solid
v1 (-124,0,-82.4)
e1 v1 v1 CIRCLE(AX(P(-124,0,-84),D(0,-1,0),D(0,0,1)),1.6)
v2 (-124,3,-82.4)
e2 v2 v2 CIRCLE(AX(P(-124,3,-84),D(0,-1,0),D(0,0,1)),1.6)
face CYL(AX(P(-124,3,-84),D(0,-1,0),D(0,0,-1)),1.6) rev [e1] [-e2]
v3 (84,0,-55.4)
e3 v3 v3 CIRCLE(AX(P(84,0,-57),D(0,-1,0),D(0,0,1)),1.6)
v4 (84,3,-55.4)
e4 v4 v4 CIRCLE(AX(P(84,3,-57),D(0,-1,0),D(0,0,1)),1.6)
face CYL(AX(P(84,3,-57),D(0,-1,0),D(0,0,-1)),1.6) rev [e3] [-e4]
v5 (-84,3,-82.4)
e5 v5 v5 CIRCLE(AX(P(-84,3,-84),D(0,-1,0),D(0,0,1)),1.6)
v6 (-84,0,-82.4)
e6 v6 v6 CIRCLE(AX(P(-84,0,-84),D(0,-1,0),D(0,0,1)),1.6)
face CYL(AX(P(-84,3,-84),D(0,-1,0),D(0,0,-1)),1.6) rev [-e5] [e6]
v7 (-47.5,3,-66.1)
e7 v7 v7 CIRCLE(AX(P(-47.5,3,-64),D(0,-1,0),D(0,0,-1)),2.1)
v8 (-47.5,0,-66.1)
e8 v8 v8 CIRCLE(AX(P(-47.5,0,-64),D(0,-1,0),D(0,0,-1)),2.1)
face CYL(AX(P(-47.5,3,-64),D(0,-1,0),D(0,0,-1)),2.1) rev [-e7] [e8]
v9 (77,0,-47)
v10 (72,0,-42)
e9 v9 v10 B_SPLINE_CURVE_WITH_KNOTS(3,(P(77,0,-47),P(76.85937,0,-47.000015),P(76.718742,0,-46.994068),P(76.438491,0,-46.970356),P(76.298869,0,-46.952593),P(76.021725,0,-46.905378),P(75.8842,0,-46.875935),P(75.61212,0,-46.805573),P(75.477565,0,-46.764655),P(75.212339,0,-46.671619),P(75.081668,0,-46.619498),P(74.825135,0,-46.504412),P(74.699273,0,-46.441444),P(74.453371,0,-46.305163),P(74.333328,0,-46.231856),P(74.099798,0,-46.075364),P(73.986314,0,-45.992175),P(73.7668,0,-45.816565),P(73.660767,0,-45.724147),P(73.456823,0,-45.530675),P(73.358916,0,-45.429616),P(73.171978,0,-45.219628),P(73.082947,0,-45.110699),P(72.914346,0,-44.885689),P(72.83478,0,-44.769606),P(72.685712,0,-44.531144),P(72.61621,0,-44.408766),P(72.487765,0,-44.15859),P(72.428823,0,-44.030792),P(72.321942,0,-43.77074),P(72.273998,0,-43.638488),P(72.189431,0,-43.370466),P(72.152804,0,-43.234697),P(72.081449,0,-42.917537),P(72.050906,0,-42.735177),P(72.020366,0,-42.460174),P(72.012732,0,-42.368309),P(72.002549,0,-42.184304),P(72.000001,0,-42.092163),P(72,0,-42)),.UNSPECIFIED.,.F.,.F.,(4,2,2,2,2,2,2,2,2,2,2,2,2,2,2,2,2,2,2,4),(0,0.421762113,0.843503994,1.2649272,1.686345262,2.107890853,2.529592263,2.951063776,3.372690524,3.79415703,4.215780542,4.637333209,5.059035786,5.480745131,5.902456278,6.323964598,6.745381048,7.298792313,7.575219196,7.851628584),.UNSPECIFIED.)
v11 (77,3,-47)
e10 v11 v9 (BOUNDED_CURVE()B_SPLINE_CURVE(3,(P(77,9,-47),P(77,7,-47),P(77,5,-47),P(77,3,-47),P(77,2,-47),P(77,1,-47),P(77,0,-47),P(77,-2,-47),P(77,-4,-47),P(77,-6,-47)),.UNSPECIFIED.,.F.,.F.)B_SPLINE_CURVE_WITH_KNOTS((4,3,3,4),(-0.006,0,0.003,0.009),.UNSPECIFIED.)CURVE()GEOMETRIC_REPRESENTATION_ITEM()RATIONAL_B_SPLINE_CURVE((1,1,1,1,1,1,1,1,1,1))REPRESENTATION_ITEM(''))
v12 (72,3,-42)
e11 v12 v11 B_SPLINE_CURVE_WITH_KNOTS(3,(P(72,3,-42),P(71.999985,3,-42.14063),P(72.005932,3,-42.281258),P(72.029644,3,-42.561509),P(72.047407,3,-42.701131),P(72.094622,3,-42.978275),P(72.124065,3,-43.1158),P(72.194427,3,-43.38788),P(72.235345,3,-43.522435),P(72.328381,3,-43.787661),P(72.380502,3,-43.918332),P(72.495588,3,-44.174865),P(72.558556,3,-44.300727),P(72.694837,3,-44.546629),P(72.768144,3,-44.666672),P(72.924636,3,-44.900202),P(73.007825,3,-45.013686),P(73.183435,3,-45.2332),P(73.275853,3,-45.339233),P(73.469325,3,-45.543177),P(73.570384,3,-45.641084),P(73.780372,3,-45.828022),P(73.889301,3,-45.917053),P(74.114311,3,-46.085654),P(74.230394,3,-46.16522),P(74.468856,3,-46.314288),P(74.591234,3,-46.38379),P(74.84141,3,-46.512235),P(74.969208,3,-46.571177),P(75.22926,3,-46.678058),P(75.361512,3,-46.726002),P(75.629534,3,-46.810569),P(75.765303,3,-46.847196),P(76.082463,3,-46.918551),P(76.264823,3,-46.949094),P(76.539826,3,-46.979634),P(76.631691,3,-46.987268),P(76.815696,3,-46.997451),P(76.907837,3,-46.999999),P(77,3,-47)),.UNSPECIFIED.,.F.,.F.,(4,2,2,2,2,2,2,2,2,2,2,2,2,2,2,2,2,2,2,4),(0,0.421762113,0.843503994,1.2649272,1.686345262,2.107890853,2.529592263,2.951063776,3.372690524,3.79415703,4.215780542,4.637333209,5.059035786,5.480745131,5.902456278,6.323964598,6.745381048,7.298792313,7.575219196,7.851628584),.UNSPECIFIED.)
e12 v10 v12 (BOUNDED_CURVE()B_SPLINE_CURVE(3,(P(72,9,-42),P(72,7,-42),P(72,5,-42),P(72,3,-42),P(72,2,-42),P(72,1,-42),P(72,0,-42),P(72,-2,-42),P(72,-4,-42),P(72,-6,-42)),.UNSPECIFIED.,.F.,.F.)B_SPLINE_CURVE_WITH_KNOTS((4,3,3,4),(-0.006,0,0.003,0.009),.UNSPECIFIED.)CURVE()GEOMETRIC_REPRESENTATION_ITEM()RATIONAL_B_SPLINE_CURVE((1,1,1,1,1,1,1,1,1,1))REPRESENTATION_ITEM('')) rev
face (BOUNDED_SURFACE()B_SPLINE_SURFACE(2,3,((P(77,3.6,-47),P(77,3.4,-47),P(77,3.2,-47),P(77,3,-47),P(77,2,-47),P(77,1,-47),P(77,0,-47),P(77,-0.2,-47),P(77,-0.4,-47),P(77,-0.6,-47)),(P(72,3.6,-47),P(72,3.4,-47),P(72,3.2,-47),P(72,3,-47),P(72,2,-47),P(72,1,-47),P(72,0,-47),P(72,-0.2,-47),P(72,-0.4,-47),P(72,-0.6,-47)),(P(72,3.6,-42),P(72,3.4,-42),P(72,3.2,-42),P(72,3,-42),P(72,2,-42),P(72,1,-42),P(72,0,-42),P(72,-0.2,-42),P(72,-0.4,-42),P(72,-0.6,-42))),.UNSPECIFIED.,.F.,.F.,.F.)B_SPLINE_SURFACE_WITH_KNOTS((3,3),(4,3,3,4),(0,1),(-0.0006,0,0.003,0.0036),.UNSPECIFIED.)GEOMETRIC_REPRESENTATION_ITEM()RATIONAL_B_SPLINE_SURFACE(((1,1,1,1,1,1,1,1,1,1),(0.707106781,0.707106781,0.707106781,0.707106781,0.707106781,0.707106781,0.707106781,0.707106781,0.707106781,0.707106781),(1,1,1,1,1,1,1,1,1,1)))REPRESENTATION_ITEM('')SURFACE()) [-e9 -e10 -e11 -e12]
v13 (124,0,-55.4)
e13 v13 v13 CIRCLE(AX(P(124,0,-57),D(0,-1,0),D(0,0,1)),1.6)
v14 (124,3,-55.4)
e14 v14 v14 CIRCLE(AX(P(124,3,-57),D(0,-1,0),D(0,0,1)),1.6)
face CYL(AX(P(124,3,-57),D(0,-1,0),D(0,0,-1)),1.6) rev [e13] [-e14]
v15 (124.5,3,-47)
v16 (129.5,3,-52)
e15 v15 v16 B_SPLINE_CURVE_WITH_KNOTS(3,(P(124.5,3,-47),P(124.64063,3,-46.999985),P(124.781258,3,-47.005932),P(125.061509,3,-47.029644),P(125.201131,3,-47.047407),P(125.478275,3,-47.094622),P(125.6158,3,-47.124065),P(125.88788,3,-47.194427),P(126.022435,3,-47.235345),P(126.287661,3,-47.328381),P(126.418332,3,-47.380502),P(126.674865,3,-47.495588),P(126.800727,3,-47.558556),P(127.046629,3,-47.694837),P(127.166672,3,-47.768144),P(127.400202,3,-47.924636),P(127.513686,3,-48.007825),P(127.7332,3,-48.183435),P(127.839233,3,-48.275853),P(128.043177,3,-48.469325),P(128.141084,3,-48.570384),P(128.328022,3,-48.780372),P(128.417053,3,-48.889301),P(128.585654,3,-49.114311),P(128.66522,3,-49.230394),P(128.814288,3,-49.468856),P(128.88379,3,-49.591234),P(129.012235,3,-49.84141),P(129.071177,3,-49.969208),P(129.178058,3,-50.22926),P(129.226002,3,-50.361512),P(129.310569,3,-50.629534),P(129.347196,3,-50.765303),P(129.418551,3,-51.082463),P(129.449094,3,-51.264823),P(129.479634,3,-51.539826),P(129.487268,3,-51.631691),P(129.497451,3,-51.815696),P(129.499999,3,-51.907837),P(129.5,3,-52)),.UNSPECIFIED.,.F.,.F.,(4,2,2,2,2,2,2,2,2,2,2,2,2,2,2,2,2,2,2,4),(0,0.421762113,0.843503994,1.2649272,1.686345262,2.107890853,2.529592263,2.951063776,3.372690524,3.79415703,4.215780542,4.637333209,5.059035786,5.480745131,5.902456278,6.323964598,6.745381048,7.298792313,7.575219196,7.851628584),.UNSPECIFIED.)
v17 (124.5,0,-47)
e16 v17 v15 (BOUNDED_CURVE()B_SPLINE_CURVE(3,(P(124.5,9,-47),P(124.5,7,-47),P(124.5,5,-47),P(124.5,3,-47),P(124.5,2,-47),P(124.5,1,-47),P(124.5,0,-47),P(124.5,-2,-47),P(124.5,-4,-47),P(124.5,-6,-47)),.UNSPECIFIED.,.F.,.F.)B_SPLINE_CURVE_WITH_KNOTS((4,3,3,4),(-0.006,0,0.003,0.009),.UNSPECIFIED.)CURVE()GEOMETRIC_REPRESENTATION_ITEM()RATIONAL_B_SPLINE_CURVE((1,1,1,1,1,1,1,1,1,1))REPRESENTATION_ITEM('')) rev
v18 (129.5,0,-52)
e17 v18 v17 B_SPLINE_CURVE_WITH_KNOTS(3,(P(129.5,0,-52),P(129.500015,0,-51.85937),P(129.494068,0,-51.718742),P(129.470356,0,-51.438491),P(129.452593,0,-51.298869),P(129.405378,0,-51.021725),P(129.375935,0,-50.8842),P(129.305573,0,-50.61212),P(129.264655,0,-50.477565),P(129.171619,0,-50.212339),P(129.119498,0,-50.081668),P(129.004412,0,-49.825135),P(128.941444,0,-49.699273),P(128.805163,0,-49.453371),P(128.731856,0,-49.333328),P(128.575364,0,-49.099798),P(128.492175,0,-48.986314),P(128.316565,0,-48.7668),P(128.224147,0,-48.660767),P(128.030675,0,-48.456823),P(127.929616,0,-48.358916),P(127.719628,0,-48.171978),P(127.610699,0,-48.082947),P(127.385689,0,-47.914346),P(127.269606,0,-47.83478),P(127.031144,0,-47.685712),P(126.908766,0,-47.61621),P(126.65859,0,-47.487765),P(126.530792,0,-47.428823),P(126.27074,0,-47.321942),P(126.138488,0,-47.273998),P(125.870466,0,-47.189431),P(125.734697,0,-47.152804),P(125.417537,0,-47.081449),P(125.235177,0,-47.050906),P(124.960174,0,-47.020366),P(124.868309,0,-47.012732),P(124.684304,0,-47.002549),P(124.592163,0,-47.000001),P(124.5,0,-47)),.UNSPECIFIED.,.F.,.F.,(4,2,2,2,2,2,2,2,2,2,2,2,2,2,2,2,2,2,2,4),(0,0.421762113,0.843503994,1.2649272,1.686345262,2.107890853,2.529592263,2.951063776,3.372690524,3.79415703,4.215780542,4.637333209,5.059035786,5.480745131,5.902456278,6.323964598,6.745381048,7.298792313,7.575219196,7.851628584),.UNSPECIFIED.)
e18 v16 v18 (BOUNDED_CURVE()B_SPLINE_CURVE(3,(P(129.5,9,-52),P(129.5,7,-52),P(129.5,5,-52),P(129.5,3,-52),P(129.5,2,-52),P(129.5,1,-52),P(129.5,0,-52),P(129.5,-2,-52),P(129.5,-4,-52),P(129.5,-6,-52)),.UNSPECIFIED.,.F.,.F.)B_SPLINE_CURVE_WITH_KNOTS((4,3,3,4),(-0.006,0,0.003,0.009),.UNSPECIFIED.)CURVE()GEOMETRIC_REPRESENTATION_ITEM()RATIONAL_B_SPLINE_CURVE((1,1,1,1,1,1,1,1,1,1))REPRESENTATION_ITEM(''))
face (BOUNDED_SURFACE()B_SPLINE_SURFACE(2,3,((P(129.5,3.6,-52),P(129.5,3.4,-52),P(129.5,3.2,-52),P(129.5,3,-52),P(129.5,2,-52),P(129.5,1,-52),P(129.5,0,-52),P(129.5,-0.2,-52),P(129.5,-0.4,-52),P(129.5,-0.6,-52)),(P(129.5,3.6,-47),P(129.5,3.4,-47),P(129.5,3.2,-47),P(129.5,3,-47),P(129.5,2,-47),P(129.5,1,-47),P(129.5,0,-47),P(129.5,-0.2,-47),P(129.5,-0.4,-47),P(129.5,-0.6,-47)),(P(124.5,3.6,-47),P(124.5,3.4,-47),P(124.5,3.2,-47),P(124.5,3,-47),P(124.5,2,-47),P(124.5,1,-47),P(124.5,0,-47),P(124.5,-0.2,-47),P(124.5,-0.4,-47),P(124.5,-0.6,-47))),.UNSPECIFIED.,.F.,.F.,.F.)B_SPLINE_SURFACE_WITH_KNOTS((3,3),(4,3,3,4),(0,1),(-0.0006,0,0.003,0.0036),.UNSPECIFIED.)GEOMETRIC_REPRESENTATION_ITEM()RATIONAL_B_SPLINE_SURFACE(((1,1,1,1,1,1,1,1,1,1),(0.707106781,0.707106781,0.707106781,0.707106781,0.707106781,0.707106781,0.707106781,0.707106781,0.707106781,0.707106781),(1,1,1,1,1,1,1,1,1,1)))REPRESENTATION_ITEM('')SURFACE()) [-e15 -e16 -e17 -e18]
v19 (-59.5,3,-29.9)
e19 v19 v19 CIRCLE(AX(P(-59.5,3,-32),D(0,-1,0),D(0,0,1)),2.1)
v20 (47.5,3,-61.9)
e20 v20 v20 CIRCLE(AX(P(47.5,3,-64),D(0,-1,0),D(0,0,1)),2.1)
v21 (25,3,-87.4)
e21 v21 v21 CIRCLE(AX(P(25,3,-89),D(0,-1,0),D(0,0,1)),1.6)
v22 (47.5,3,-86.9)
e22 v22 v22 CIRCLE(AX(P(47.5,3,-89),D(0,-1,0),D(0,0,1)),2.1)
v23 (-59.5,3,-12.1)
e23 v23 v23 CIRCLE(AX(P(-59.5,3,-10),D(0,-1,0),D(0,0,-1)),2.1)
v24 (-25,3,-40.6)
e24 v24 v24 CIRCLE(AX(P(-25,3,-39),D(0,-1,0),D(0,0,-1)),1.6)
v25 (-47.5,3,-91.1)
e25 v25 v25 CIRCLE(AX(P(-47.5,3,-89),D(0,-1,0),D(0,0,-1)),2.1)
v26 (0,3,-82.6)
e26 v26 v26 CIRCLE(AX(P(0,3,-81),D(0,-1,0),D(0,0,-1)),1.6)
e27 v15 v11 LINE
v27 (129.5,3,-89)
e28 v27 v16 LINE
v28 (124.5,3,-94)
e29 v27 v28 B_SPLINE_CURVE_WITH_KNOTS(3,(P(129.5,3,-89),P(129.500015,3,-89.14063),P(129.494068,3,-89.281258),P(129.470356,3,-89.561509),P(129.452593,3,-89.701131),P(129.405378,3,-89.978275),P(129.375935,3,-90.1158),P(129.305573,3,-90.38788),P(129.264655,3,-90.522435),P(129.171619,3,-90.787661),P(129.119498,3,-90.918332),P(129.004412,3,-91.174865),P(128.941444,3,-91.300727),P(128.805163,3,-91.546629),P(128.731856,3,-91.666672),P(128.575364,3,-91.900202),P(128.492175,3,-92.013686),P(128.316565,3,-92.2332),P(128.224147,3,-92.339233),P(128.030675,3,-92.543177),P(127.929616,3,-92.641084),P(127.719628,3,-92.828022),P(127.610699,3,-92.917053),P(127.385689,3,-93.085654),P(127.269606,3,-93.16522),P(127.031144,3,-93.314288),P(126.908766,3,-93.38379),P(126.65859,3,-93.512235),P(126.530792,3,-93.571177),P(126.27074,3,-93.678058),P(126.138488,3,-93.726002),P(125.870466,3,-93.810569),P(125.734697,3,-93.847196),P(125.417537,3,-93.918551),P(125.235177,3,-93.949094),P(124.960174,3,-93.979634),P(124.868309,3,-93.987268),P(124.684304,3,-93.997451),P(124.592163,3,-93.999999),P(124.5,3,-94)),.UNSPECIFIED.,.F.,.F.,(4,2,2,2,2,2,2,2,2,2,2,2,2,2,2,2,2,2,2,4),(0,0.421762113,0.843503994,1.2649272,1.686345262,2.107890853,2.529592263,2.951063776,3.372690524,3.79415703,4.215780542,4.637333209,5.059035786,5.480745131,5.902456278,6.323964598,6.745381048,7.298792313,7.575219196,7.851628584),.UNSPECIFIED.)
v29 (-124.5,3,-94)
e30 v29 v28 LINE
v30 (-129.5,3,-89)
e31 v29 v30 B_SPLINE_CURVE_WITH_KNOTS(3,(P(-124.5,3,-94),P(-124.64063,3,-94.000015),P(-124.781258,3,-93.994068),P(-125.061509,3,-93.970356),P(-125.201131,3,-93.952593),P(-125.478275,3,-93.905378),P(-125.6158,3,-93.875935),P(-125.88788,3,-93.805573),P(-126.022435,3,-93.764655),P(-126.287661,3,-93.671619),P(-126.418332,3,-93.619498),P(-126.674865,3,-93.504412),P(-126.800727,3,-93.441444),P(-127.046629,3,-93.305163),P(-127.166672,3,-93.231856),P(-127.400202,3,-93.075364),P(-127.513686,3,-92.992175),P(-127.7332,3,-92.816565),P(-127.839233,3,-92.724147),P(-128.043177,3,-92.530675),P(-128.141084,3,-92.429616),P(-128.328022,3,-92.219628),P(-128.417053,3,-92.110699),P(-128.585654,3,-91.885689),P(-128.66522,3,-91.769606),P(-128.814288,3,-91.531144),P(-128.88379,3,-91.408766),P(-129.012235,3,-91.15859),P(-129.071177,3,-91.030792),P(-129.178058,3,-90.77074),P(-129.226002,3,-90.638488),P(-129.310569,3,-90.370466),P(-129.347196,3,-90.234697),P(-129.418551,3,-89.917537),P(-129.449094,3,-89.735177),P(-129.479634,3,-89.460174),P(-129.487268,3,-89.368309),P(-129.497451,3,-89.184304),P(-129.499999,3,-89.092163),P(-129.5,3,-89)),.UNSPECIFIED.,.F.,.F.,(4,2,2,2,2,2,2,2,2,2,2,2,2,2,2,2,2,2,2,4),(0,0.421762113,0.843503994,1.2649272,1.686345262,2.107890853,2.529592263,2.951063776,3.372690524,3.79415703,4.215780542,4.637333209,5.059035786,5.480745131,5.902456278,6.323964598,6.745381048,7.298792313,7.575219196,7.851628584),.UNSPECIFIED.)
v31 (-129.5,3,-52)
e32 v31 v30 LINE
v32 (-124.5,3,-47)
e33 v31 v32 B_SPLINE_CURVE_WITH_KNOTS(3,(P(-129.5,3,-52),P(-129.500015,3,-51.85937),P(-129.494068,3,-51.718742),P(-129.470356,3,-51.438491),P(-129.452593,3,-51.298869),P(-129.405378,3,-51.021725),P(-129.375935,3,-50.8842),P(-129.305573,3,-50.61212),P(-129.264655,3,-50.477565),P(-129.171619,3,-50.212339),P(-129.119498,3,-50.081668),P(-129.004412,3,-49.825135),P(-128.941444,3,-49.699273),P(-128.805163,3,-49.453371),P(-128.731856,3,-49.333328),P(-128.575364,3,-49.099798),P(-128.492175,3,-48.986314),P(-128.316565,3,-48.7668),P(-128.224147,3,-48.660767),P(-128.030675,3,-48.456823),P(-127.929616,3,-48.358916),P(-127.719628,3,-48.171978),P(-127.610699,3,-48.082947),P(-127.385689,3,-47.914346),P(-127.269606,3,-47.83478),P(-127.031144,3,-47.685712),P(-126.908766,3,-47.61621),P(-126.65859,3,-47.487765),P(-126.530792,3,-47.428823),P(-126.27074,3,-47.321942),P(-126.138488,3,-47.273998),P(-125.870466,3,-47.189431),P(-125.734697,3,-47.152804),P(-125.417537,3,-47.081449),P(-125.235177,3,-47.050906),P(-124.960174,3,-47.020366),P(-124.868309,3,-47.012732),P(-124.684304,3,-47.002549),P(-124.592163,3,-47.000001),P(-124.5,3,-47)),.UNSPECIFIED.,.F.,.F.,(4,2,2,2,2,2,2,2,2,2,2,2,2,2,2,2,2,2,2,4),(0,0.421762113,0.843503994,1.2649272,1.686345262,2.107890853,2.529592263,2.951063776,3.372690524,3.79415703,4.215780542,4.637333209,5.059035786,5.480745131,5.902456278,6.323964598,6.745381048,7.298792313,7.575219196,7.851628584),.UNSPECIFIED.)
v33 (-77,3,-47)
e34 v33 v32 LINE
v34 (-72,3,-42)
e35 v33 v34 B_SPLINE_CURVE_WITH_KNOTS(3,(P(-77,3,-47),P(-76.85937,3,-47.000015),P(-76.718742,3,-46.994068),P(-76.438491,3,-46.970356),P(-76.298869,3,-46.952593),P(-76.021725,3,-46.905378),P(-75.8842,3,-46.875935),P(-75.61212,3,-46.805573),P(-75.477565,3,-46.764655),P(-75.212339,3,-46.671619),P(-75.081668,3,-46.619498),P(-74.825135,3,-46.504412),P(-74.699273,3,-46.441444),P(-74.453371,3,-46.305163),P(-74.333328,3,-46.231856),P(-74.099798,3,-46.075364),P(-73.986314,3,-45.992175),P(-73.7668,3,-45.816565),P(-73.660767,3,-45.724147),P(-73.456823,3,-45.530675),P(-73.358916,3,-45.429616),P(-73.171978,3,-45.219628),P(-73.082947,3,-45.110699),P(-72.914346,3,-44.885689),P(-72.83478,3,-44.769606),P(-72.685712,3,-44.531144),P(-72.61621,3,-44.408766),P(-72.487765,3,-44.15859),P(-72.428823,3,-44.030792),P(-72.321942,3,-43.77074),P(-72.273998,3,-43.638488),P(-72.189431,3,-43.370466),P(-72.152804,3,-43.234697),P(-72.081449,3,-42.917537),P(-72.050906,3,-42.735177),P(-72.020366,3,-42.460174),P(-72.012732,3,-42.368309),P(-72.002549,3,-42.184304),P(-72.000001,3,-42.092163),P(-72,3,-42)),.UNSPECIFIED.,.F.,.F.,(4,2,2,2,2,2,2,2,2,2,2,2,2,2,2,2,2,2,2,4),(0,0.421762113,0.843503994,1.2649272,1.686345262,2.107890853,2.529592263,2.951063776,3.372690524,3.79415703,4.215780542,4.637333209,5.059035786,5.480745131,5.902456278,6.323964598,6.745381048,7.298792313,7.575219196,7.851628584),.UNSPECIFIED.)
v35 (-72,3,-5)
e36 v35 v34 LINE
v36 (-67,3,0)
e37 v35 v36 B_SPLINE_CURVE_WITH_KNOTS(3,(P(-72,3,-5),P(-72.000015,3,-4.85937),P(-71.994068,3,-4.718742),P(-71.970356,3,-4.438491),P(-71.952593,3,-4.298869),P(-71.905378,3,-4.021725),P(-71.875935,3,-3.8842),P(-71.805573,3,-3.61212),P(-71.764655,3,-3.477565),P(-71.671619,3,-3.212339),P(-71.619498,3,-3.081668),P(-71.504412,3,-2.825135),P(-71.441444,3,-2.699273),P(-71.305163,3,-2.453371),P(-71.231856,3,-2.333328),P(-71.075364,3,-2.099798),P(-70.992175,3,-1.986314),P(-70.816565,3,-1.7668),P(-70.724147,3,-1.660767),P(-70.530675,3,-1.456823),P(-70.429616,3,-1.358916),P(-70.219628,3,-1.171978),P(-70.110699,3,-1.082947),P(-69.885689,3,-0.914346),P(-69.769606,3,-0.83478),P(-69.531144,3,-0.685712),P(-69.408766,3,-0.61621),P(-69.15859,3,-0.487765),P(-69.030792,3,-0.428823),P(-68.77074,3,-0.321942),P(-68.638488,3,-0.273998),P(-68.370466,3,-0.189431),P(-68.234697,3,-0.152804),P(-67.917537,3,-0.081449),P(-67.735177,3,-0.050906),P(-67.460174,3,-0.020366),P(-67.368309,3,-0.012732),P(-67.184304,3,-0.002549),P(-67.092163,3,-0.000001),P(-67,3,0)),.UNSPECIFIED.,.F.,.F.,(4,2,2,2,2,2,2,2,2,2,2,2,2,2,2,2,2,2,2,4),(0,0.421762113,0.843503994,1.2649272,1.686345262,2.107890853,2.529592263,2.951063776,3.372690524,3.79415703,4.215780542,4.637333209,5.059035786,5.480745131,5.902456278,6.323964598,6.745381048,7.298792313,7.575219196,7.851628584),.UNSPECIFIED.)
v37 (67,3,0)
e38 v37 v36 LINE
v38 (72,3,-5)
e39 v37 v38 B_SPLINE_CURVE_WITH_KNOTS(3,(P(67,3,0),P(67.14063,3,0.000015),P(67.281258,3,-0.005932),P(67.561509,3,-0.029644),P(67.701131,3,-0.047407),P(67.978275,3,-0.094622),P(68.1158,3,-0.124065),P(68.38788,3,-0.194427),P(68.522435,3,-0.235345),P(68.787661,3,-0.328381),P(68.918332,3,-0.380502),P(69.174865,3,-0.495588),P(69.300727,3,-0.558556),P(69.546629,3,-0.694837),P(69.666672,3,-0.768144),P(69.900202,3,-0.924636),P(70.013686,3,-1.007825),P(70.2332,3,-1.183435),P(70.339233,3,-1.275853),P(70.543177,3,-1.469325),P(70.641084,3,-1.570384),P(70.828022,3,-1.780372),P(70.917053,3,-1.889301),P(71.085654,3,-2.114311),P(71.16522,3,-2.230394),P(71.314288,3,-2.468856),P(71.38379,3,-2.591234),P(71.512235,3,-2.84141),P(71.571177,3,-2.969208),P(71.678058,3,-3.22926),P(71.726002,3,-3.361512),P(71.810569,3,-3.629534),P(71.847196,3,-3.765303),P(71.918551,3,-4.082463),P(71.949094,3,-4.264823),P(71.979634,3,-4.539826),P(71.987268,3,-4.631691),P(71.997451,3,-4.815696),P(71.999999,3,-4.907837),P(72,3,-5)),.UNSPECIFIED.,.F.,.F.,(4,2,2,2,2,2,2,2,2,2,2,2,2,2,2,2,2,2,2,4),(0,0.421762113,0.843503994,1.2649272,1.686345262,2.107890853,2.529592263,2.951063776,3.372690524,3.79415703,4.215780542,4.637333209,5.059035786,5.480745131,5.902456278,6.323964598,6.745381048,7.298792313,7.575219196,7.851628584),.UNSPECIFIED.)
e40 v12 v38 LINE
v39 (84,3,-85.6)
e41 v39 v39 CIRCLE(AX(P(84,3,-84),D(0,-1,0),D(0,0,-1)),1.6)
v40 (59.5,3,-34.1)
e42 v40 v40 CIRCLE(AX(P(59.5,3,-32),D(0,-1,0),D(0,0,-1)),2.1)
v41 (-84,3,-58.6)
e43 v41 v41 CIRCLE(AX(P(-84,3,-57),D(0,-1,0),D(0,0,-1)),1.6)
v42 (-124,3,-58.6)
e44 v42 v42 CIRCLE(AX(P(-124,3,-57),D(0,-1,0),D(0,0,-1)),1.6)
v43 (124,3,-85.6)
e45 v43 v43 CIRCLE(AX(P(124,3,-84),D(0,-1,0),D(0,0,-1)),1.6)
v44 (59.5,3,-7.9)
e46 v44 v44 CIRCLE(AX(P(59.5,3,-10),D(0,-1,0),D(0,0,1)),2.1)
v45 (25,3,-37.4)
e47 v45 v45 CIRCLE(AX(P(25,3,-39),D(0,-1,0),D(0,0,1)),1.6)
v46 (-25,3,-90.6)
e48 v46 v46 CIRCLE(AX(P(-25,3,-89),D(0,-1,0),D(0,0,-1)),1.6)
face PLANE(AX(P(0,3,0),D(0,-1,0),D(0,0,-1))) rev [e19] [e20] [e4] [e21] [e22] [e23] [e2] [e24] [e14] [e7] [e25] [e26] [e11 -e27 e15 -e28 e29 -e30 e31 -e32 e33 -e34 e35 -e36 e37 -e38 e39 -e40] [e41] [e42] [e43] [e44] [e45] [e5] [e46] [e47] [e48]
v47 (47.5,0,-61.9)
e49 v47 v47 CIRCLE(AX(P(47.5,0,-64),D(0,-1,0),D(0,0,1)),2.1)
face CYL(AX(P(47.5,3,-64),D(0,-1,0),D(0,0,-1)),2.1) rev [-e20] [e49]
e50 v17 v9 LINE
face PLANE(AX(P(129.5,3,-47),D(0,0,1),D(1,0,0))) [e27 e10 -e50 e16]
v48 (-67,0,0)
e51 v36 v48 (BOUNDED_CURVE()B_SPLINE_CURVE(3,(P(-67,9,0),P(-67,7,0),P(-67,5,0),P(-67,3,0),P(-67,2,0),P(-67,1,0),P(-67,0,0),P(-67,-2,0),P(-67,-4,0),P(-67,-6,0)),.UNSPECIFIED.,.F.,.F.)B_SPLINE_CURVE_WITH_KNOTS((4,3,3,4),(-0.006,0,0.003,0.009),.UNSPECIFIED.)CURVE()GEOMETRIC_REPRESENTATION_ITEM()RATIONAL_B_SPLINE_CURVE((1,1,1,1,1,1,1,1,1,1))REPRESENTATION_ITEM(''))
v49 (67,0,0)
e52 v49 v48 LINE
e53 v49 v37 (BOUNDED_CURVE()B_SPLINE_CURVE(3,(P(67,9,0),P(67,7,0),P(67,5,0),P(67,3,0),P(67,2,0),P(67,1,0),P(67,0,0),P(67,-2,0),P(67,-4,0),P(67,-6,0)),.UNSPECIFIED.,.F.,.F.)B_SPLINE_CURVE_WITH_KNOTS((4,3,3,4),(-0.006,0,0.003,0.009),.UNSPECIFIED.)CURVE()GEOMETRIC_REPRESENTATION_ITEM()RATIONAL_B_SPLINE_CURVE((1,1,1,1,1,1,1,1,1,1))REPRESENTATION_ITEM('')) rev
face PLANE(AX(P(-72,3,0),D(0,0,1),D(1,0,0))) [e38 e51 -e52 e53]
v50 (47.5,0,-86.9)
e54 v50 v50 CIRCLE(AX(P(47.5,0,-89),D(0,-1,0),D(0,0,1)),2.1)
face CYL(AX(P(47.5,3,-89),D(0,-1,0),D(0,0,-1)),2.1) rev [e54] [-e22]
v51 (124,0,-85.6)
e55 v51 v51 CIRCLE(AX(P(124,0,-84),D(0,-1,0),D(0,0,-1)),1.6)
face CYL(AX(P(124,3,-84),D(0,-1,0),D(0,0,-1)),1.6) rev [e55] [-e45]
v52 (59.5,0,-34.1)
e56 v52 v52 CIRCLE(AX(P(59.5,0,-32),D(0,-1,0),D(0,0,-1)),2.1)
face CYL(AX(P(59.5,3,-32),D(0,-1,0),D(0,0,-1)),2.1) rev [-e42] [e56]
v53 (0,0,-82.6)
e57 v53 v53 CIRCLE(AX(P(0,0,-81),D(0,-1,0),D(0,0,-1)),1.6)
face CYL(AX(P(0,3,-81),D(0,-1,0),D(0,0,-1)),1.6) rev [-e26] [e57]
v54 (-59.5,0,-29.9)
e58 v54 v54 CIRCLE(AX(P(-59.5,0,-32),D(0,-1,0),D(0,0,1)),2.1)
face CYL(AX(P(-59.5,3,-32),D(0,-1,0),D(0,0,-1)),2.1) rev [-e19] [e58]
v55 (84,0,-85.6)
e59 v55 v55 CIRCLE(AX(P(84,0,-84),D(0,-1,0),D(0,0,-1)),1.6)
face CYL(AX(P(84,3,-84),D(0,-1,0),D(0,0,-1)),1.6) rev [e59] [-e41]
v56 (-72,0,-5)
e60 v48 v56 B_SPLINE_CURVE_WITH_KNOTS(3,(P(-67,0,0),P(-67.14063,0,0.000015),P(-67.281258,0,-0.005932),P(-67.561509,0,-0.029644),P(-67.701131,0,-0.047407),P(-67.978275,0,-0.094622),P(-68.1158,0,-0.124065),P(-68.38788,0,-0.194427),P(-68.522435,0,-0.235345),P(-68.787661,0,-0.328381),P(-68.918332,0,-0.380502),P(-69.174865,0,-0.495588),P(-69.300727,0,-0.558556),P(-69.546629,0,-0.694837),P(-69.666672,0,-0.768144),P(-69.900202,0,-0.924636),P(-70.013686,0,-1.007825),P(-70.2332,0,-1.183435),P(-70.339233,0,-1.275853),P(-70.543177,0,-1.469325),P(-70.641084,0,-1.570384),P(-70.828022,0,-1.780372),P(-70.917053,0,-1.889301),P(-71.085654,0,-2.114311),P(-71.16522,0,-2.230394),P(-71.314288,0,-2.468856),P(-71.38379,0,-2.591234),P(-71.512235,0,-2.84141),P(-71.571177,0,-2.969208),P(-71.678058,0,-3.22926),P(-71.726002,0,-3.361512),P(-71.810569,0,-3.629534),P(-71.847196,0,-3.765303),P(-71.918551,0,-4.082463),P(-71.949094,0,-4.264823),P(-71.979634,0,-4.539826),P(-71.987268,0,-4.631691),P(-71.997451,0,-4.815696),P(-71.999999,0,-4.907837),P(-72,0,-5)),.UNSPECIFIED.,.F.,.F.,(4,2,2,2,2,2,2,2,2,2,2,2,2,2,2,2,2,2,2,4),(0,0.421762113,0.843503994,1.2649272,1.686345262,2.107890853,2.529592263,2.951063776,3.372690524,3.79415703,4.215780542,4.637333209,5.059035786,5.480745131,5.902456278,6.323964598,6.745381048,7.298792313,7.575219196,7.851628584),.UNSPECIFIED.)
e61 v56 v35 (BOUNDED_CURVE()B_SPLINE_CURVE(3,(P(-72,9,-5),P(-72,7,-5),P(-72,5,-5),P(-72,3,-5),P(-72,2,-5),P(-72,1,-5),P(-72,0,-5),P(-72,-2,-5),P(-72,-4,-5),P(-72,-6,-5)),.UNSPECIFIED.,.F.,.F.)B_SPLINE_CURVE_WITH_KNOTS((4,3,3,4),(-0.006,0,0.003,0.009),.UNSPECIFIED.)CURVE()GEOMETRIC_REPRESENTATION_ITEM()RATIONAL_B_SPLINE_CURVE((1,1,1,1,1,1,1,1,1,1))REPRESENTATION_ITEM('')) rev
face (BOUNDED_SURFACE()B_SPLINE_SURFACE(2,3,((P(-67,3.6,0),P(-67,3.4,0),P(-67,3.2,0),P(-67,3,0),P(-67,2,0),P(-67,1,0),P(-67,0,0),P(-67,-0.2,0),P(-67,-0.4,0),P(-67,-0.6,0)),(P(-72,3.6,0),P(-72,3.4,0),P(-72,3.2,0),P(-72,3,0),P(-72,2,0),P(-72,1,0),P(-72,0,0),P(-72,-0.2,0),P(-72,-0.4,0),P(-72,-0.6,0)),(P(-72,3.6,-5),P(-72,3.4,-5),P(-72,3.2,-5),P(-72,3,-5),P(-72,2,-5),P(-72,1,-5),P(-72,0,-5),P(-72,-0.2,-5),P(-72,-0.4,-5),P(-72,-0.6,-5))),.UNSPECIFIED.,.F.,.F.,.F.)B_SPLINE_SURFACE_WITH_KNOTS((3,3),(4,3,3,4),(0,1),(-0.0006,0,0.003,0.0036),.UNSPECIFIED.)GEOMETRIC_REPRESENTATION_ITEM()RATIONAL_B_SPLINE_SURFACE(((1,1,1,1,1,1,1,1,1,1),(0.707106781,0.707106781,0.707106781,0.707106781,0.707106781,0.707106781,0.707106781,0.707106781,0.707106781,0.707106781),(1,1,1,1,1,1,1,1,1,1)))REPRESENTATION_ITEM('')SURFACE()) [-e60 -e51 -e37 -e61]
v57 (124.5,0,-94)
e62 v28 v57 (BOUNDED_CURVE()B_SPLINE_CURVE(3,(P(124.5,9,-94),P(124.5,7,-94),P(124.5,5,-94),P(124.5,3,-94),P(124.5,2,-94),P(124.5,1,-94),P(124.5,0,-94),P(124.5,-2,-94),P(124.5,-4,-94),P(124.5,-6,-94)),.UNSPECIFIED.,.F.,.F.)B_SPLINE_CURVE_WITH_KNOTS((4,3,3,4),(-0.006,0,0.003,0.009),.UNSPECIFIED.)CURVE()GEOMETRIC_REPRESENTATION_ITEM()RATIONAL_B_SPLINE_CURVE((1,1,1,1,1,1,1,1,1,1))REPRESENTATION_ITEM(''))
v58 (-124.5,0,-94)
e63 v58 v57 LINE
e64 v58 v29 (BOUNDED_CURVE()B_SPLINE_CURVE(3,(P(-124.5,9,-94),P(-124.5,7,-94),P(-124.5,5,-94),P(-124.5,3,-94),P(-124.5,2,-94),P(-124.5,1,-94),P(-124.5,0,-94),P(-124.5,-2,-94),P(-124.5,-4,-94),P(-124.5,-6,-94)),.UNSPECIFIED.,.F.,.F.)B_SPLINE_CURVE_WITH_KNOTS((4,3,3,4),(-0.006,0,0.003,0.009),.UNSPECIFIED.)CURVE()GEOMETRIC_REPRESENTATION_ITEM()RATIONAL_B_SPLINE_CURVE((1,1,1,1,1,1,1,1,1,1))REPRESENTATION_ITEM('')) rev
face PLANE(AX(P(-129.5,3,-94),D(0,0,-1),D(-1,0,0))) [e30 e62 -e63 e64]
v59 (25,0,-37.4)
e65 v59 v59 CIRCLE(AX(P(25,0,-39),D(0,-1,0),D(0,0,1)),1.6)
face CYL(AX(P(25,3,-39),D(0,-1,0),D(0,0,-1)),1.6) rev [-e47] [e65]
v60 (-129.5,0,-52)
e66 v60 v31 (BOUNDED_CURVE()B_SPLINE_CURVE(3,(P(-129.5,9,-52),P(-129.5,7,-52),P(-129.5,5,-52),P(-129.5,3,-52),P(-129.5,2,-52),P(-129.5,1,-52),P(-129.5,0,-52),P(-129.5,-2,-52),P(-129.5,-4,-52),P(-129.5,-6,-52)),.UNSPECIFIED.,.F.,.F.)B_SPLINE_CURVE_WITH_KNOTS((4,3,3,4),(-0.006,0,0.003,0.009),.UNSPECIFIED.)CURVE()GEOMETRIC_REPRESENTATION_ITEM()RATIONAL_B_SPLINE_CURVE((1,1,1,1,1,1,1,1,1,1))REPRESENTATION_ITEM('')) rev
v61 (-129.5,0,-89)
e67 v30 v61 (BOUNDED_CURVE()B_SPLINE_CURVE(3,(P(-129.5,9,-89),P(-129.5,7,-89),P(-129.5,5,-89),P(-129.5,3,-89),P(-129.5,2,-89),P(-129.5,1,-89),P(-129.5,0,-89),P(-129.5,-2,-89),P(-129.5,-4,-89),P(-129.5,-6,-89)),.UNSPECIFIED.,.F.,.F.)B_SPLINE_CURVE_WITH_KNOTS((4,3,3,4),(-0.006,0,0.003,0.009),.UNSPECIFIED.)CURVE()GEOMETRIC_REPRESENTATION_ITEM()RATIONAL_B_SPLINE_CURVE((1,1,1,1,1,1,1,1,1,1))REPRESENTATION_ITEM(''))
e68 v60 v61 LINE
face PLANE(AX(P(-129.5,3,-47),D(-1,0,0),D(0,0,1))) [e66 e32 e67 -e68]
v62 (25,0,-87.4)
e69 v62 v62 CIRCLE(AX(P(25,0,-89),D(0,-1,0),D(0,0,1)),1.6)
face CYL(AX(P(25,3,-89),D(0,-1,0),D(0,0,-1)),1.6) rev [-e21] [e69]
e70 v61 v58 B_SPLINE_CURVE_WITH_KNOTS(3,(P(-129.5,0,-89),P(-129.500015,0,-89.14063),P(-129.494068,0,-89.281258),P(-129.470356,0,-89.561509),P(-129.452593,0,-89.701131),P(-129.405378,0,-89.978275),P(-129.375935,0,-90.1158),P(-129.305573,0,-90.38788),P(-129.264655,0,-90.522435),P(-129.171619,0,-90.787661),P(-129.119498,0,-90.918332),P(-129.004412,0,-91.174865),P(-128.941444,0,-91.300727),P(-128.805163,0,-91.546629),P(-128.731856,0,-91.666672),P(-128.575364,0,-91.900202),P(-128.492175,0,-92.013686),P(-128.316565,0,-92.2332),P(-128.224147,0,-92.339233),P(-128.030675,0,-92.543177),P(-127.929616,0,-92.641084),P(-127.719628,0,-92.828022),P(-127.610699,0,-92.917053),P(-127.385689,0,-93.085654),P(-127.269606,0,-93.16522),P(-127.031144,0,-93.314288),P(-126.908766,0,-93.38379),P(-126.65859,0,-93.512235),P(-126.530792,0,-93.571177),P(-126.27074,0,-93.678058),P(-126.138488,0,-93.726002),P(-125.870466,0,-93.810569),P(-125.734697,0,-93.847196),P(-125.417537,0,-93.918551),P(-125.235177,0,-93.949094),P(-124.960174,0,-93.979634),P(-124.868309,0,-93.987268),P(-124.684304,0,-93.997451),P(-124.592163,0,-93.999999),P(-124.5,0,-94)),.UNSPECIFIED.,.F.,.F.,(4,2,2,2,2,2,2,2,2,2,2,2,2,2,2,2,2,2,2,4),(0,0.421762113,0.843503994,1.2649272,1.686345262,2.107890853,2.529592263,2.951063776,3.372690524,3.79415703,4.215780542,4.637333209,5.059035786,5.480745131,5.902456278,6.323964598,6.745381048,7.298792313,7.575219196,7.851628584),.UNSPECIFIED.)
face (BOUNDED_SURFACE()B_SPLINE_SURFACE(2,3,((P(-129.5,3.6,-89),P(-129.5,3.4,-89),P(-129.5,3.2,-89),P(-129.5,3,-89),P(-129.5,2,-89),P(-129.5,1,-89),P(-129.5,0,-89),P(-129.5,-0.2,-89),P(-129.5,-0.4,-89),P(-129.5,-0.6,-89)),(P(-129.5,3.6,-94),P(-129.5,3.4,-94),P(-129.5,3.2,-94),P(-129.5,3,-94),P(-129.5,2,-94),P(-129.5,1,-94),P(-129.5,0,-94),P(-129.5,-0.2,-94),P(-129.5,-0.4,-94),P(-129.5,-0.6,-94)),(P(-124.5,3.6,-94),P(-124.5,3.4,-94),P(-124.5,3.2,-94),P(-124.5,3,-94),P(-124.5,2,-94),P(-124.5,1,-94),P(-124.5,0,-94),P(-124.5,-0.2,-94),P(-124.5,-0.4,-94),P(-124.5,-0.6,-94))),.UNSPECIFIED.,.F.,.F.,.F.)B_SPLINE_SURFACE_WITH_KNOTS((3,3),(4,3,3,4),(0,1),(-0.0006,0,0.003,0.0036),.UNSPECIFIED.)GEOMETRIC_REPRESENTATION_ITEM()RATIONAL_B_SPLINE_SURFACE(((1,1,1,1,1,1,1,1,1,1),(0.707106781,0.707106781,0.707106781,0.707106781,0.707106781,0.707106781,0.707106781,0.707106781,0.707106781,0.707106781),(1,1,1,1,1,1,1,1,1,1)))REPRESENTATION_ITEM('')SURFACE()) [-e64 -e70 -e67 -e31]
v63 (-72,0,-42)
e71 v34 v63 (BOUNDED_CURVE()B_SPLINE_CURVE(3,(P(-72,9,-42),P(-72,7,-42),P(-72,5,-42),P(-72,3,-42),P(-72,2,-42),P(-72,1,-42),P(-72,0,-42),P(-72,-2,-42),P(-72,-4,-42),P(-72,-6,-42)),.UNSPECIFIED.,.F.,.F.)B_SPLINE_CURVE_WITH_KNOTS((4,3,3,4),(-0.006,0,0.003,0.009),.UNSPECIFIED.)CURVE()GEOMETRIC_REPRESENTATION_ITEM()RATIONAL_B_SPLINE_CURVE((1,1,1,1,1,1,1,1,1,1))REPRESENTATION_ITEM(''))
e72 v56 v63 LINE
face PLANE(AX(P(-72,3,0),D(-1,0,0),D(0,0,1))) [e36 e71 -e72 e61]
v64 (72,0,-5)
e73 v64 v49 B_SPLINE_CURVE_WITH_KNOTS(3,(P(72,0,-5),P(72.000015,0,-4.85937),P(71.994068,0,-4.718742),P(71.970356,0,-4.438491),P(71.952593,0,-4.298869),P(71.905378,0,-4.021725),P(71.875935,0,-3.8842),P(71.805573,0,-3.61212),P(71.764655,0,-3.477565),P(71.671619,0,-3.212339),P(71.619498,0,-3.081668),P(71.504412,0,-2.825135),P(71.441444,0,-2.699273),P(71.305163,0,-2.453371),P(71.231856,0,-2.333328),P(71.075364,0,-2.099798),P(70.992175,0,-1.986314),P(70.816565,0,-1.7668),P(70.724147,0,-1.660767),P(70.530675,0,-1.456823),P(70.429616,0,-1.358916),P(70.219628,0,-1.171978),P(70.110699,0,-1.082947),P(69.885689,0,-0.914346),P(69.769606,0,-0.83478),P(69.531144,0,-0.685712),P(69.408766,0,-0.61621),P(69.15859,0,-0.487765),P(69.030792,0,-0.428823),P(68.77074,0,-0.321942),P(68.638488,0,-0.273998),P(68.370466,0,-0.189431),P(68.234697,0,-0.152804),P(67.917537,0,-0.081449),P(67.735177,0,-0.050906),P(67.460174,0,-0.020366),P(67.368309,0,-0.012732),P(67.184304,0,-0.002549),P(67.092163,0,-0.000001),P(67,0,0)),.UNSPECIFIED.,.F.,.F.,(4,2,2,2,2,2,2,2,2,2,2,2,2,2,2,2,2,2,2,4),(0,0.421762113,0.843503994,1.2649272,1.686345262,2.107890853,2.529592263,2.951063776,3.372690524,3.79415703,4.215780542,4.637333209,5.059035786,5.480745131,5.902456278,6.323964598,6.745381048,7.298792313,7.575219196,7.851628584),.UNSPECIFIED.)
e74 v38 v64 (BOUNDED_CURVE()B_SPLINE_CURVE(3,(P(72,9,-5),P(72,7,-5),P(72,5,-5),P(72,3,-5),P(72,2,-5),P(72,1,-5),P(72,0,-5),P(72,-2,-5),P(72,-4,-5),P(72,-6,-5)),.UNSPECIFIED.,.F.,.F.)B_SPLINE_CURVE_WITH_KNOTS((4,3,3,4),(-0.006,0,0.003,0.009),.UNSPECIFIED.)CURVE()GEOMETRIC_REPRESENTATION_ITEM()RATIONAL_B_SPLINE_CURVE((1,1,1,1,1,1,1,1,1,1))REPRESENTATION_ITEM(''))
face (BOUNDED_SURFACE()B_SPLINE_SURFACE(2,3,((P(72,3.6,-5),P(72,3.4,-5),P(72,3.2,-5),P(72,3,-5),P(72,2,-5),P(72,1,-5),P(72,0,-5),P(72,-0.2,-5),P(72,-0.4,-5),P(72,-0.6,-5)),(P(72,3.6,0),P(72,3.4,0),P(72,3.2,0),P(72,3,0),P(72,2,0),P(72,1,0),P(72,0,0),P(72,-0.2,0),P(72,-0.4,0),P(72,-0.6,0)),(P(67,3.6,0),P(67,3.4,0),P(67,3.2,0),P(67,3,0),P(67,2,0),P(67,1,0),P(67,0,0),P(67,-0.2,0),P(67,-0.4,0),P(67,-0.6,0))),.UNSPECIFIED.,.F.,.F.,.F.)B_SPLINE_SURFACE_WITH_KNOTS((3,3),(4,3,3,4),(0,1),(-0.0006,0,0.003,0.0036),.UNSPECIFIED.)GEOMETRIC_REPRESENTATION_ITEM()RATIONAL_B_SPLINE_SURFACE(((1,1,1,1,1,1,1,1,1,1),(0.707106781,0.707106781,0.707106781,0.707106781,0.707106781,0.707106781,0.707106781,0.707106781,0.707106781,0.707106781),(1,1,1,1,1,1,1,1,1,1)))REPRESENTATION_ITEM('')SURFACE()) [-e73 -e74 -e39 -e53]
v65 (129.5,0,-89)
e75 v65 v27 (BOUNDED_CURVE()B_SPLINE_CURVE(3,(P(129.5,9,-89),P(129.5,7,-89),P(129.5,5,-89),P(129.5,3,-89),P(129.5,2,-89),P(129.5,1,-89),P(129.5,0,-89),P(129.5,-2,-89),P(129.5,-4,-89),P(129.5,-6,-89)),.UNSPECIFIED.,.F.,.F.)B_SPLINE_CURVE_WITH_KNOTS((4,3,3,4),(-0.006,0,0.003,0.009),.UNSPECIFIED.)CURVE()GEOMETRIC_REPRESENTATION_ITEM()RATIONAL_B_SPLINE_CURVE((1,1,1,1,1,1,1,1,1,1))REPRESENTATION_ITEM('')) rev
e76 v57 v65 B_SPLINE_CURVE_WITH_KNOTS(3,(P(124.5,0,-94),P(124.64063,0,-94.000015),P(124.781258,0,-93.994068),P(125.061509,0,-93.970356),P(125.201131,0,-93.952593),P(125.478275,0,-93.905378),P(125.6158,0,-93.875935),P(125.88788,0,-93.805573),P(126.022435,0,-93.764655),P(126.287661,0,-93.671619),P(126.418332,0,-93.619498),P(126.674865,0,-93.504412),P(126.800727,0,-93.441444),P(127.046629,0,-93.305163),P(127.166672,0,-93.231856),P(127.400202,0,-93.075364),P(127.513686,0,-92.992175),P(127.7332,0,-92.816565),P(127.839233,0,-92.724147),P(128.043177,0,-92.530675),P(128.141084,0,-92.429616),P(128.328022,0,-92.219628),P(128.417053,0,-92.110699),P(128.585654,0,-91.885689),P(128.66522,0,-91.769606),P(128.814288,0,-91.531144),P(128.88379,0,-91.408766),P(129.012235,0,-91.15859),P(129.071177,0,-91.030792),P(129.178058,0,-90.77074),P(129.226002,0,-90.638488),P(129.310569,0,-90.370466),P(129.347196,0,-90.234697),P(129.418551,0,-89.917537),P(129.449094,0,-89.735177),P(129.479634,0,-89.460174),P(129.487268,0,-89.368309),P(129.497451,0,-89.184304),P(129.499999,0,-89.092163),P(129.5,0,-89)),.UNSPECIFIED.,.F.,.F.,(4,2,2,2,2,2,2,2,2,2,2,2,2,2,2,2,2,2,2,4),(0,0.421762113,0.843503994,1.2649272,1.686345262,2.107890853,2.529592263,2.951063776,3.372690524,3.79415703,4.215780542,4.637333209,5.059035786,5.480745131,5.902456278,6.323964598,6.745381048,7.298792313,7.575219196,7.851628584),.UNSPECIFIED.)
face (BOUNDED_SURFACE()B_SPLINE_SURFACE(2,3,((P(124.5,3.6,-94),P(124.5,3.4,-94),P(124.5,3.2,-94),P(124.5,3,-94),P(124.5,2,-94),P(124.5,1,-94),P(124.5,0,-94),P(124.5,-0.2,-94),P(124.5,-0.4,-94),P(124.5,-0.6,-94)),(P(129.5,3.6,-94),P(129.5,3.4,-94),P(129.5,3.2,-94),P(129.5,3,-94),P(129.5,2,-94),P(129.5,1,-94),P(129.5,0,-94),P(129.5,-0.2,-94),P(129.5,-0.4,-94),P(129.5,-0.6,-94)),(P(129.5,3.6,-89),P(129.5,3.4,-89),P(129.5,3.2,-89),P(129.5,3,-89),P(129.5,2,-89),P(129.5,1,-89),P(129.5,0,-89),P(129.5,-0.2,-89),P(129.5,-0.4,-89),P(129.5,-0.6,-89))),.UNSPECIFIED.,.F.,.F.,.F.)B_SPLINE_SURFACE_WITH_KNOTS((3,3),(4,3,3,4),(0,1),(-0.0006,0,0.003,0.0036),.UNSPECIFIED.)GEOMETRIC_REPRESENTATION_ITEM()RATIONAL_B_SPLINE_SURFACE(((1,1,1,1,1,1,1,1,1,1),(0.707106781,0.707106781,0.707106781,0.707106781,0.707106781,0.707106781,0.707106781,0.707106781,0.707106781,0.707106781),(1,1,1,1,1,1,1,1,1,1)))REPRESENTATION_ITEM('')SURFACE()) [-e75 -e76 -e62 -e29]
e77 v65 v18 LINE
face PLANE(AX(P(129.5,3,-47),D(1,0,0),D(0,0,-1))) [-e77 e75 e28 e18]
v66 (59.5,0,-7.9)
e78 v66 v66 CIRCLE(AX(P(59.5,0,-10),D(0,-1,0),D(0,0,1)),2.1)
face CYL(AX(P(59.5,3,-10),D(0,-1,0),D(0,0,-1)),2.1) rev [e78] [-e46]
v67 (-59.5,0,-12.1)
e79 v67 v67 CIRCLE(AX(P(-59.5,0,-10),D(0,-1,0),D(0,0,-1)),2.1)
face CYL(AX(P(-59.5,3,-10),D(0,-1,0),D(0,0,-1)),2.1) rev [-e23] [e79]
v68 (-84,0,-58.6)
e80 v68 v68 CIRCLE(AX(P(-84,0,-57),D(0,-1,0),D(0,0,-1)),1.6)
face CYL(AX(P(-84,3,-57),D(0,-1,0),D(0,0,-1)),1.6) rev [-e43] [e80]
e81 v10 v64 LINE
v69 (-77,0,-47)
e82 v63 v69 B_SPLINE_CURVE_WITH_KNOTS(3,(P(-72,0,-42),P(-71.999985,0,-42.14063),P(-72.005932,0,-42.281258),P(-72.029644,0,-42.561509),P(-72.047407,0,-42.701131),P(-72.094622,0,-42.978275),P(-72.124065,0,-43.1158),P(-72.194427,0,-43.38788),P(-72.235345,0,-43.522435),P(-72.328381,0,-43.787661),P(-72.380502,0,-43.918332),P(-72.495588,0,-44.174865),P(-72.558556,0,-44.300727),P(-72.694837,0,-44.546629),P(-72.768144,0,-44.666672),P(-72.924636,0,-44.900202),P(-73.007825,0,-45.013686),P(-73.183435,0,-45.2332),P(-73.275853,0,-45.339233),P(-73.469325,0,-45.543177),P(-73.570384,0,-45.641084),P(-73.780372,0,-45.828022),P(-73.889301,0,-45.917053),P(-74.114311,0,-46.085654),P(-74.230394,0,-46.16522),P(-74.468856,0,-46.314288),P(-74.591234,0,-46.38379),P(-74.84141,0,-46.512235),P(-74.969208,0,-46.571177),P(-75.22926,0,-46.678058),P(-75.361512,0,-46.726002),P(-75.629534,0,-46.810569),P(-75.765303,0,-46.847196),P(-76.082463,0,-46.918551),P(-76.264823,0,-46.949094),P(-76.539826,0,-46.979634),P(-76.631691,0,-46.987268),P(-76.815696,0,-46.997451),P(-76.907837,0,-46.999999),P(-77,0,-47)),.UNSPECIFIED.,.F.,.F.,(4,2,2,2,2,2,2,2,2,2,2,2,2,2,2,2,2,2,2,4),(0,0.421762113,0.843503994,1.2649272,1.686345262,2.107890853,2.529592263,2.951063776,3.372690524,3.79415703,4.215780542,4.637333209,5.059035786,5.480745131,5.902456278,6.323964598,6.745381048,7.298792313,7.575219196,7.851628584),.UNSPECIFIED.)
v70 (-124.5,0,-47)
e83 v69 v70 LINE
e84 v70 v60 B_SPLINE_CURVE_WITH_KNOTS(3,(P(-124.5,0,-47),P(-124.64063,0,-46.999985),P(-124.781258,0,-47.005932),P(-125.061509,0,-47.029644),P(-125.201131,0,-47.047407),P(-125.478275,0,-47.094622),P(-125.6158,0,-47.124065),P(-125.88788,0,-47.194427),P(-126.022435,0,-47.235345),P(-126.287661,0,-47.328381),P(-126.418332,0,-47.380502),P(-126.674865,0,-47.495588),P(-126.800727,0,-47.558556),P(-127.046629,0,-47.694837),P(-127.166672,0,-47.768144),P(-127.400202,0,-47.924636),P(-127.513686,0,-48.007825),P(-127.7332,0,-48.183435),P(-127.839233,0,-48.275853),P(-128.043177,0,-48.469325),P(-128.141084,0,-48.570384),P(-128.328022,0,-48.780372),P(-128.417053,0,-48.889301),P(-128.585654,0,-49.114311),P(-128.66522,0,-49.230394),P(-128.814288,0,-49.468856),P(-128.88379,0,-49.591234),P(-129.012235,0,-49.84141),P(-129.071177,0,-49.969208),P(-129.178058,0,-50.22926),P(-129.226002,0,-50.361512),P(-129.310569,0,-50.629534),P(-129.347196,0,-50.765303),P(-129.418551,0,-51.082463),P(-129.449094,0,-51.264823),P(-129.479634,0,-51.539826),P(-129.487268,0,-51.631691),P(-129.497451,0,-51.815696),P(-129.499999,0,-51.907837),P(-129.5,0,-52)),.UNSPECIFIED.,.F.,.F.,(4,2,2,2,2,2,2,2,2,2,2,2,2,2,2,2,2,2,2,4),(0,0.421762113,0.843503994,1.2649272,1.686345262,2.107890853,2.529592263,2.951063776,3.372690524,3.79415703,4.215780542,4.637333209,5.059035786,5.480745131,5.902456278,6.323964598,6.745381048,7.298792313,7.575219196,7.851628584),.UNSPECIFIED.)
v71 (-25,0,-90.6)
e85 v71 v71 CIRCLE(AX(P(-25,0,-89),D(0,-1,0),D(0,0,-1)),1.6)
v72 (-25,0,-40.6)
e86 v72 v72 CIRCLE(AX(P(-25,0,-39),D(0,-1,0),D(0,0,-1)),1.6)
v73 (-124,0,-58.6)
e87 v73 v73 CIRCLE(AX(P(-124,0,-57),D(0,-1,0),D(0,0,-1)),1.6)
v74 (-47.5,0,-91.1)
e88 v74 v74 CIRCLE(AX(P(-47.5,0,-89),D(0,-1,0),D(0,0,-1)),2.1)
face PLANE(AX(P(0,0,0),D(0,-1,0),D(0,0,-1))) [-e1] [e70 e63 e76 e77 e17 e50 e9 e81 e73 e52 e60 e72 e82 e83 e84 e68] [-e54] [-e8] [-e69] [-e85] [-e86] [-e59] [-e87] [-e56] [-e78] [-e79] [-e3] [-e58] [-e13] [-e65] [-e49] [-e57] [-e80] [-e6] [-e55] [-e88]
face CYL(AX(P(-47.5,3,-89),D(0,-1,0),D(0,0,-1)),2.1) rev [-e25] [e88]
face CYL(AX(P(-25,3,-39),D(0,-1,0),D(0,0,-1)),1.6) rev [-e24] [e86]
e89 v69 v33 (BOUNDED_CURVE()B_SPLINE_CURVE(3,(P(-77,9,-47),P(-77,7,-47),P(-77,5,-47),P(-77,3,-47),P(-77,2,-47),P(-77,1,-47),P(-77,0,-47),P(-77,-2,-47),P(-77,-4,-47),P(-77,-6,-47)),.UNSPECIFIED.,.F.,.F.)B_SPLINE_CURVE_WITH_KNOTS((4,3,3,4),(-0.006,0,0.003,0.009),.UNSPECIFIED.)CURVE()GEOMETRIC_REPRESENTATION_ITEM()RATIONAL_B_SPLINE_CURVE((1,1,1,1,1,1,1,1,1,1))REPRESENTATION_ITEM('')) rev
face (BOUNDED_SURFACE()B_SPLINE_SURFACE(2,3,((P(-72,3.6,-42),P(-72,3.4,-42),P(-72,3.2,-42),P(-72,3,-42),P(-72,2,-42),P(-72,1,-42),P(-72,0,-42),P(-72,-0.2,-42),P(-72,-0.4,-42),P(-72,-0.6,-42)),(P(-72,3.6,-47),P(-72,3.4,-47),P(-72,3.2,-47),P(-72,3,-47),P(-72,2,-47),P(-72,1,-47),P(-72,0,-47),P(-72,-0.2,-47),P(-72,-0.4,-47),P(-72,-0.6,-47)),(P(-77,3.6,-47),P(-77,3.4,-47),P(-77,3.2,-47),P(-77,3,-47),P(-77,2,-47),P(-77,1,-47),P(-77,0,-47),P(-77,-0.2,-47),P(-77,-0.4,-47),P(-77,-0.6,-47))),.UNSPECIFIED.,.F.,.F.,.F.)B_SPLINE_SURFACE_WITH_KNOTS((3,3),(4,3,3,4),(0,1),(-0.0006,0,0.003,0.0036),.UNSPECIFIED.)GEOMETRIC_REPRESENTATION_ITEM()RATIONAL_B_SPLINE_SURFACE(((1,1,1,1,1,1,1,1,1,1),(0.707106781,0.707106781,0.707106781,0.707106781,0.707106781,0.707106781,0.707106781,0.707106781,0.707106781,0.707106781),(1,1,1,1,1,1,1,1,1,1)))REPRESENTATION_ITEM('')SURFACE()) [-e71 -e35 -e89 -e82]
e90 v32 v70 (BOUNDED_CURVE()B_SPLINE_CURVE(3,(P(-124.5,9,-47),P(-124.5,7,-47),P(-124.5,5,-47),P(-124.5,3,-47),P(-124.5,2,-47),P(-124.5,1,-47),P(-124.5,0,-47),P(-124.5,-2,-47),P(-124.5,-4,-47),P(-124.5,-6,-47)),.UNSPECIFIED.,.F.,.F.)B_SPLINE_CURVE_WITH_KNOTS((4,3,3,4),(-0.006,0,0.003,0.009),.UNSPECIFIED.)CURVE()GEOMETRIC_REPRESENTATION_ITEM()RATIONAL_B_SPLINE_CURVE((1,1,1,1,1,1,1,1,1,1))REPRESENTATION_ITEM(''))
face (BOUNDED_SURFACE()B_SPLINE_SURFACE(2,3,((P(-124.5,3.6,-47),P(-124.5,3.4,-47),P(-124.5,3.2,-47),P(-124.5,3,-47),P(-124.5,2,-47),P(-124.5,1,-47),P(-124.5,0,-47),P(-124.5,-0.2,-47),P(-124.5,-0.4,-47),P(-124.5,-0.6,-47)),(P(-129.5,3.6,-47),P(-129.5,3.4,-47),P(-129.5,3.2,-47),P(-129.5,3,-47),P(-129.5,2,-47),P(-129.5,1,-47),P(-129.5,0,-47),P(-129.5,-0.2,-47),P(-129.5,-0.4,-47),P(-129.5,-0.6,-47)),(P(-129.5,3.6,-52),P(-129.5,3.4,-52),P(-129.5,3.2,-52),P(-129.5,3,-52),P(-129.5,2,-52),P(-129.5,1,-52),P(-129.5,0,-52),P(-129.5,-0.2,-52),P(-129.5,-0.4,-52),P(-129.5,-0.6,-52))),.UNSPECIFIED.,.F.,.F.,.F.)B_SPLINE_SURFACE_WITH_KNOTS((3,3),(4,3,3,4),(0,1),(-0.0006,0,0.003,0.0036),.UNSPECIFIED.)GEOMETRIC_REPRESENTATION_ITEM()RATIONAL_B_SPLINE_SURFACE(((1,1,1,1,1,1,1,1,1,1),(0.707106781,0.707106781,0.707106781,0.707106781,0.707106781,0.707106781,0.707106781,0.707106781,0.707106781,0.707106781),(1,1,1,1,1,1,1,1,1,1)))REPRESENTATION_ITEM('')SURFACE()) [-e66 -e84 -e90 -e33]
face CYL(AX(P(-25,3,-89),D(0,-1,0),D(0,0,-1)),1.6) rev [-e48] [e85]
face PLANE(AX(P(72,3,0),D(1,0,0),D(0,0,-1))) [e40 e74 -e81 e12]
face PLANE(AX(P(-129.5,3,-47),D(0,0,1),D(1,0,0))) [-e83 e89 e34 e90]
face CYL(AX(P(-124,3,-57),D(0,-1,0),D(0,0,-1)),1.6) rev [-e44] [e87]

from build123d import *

# Parameters (mm, degrees)
SKETCH_1_R      = 2.1
SKETCH_1_R_2    = 1.6
EXTRUDE_1_DEPTH = 3
FILLET_1_R      = 5


with BuildPart() as part:
    # 草图1 → 凸台-拉伸1 (new body)
    with BuildSketch(Plane.XZ):
        Polygon((-72, 0), (72, 0), (72, -47), (129.5, -47), (129.5, -94), (-129.5, -94), (-129.5, -47), (-72, -47), align=None)
        with Locations((47.5, -89)):
            Circle(SKETCH_1_R, mode=Mode.SUBTRACT)
        with Locations((-124, -84)):
            Circle(SKETCH_1_R_2, mode=Mode.SUBTRACT)
        with Locations((-25, -89)):
            Circle(SKETCH_1_R_2, mode=Mode.SUBTRACT)
        with Locations((-59.5, -32)):
            Circle(SKETCH_1_R, mode=Mode.SUBTRACT)
        with Locations((-25, -39)):
            Circle(SKETCH_1_R_2, mode=Mode.SUBTRACT)
        with Locations((84, -84)):
            Circle(SKETCH_1_R_2, mode=Mode.SUBTRACT)
        with Locations((-59.5, -10)):
            Circle(SKETCH_1_R, mode=Mode.SUBTRACT)
        with Locations((47.5, -64)):
            Circle(SKETCH_1_R, mode=Mode.SUBTRACT)
        with Locations((-84, -57)):
            Circle(SKETCH_1_R_2, mode=Mode.SUBTRACT)
        with Locations((-124, -57)):
            Circle(SKETCH_1_R_2, mode=Mode.SUBTRACT)
        with Locations((-47.5, -64)):
            Circle(SKETCH_1_R, mode=Mode.SUBTRACT)
        with Locations((-84, -84)):
            Circle(SKETCH_1_R_2, mode=Mode.SUBTRACT)
        with Locations((124, -57)):
            Circle(SKETCH_1_R_2, mode=Mode.SUBTRACT)
        with Locations((84, -57)):
            Circle(SKETCH_1_R_2, mode=Mode.SUBTRACT)
        with Locations((59.5, -10)):
            Circle(SKETCH_1_R, mode=Mode.SUBTRACT)
        with Locations((25, -39)):
            Circle(SKETCH_1_R_2, mode=Mode.SUBTRACT)
        with Locations((59.5, -32)):
            Circle(SKETCH_1_R, mode=Mode.SUBTRACT)
        with Locations((25, -89)):
            Circle(SKETCH_1_R_2, mode=Mode.SUBTRACT)
        with Locations((124, -84)):
            Circle(SKETCH_1_R_2, mode=Mode.SUBTRACT)
        with Locations((0, -81)):
            Circle(SKETCH_1_R_2, mode=Mode.SUBTRACT)
        with Locations((-47.5, -89)):
            Circle(SKETCH_1_R, mode=Mode.SUBTRACT)
    extrude(amount=-EXTRUDE_1_DEPTH)

    # 圆角1
    fillet_1_edges = [part.edges().sort_by_distance(p)[0] for p in [
        (72, 1.5, 0),
        (72, 1.5, -47),
        (129.5, 1.5, -47),
        (129.5, 1.5, -94),
        (-129.5, 1.5, -94),
        (-129.5, 1.5, -47),
        (-72, 1.5, -47),
        (-72, 1.5, 0),
    ]]
    fillet(fillet_1_edges, radius=FILLET_1_R)


solid = part.part
